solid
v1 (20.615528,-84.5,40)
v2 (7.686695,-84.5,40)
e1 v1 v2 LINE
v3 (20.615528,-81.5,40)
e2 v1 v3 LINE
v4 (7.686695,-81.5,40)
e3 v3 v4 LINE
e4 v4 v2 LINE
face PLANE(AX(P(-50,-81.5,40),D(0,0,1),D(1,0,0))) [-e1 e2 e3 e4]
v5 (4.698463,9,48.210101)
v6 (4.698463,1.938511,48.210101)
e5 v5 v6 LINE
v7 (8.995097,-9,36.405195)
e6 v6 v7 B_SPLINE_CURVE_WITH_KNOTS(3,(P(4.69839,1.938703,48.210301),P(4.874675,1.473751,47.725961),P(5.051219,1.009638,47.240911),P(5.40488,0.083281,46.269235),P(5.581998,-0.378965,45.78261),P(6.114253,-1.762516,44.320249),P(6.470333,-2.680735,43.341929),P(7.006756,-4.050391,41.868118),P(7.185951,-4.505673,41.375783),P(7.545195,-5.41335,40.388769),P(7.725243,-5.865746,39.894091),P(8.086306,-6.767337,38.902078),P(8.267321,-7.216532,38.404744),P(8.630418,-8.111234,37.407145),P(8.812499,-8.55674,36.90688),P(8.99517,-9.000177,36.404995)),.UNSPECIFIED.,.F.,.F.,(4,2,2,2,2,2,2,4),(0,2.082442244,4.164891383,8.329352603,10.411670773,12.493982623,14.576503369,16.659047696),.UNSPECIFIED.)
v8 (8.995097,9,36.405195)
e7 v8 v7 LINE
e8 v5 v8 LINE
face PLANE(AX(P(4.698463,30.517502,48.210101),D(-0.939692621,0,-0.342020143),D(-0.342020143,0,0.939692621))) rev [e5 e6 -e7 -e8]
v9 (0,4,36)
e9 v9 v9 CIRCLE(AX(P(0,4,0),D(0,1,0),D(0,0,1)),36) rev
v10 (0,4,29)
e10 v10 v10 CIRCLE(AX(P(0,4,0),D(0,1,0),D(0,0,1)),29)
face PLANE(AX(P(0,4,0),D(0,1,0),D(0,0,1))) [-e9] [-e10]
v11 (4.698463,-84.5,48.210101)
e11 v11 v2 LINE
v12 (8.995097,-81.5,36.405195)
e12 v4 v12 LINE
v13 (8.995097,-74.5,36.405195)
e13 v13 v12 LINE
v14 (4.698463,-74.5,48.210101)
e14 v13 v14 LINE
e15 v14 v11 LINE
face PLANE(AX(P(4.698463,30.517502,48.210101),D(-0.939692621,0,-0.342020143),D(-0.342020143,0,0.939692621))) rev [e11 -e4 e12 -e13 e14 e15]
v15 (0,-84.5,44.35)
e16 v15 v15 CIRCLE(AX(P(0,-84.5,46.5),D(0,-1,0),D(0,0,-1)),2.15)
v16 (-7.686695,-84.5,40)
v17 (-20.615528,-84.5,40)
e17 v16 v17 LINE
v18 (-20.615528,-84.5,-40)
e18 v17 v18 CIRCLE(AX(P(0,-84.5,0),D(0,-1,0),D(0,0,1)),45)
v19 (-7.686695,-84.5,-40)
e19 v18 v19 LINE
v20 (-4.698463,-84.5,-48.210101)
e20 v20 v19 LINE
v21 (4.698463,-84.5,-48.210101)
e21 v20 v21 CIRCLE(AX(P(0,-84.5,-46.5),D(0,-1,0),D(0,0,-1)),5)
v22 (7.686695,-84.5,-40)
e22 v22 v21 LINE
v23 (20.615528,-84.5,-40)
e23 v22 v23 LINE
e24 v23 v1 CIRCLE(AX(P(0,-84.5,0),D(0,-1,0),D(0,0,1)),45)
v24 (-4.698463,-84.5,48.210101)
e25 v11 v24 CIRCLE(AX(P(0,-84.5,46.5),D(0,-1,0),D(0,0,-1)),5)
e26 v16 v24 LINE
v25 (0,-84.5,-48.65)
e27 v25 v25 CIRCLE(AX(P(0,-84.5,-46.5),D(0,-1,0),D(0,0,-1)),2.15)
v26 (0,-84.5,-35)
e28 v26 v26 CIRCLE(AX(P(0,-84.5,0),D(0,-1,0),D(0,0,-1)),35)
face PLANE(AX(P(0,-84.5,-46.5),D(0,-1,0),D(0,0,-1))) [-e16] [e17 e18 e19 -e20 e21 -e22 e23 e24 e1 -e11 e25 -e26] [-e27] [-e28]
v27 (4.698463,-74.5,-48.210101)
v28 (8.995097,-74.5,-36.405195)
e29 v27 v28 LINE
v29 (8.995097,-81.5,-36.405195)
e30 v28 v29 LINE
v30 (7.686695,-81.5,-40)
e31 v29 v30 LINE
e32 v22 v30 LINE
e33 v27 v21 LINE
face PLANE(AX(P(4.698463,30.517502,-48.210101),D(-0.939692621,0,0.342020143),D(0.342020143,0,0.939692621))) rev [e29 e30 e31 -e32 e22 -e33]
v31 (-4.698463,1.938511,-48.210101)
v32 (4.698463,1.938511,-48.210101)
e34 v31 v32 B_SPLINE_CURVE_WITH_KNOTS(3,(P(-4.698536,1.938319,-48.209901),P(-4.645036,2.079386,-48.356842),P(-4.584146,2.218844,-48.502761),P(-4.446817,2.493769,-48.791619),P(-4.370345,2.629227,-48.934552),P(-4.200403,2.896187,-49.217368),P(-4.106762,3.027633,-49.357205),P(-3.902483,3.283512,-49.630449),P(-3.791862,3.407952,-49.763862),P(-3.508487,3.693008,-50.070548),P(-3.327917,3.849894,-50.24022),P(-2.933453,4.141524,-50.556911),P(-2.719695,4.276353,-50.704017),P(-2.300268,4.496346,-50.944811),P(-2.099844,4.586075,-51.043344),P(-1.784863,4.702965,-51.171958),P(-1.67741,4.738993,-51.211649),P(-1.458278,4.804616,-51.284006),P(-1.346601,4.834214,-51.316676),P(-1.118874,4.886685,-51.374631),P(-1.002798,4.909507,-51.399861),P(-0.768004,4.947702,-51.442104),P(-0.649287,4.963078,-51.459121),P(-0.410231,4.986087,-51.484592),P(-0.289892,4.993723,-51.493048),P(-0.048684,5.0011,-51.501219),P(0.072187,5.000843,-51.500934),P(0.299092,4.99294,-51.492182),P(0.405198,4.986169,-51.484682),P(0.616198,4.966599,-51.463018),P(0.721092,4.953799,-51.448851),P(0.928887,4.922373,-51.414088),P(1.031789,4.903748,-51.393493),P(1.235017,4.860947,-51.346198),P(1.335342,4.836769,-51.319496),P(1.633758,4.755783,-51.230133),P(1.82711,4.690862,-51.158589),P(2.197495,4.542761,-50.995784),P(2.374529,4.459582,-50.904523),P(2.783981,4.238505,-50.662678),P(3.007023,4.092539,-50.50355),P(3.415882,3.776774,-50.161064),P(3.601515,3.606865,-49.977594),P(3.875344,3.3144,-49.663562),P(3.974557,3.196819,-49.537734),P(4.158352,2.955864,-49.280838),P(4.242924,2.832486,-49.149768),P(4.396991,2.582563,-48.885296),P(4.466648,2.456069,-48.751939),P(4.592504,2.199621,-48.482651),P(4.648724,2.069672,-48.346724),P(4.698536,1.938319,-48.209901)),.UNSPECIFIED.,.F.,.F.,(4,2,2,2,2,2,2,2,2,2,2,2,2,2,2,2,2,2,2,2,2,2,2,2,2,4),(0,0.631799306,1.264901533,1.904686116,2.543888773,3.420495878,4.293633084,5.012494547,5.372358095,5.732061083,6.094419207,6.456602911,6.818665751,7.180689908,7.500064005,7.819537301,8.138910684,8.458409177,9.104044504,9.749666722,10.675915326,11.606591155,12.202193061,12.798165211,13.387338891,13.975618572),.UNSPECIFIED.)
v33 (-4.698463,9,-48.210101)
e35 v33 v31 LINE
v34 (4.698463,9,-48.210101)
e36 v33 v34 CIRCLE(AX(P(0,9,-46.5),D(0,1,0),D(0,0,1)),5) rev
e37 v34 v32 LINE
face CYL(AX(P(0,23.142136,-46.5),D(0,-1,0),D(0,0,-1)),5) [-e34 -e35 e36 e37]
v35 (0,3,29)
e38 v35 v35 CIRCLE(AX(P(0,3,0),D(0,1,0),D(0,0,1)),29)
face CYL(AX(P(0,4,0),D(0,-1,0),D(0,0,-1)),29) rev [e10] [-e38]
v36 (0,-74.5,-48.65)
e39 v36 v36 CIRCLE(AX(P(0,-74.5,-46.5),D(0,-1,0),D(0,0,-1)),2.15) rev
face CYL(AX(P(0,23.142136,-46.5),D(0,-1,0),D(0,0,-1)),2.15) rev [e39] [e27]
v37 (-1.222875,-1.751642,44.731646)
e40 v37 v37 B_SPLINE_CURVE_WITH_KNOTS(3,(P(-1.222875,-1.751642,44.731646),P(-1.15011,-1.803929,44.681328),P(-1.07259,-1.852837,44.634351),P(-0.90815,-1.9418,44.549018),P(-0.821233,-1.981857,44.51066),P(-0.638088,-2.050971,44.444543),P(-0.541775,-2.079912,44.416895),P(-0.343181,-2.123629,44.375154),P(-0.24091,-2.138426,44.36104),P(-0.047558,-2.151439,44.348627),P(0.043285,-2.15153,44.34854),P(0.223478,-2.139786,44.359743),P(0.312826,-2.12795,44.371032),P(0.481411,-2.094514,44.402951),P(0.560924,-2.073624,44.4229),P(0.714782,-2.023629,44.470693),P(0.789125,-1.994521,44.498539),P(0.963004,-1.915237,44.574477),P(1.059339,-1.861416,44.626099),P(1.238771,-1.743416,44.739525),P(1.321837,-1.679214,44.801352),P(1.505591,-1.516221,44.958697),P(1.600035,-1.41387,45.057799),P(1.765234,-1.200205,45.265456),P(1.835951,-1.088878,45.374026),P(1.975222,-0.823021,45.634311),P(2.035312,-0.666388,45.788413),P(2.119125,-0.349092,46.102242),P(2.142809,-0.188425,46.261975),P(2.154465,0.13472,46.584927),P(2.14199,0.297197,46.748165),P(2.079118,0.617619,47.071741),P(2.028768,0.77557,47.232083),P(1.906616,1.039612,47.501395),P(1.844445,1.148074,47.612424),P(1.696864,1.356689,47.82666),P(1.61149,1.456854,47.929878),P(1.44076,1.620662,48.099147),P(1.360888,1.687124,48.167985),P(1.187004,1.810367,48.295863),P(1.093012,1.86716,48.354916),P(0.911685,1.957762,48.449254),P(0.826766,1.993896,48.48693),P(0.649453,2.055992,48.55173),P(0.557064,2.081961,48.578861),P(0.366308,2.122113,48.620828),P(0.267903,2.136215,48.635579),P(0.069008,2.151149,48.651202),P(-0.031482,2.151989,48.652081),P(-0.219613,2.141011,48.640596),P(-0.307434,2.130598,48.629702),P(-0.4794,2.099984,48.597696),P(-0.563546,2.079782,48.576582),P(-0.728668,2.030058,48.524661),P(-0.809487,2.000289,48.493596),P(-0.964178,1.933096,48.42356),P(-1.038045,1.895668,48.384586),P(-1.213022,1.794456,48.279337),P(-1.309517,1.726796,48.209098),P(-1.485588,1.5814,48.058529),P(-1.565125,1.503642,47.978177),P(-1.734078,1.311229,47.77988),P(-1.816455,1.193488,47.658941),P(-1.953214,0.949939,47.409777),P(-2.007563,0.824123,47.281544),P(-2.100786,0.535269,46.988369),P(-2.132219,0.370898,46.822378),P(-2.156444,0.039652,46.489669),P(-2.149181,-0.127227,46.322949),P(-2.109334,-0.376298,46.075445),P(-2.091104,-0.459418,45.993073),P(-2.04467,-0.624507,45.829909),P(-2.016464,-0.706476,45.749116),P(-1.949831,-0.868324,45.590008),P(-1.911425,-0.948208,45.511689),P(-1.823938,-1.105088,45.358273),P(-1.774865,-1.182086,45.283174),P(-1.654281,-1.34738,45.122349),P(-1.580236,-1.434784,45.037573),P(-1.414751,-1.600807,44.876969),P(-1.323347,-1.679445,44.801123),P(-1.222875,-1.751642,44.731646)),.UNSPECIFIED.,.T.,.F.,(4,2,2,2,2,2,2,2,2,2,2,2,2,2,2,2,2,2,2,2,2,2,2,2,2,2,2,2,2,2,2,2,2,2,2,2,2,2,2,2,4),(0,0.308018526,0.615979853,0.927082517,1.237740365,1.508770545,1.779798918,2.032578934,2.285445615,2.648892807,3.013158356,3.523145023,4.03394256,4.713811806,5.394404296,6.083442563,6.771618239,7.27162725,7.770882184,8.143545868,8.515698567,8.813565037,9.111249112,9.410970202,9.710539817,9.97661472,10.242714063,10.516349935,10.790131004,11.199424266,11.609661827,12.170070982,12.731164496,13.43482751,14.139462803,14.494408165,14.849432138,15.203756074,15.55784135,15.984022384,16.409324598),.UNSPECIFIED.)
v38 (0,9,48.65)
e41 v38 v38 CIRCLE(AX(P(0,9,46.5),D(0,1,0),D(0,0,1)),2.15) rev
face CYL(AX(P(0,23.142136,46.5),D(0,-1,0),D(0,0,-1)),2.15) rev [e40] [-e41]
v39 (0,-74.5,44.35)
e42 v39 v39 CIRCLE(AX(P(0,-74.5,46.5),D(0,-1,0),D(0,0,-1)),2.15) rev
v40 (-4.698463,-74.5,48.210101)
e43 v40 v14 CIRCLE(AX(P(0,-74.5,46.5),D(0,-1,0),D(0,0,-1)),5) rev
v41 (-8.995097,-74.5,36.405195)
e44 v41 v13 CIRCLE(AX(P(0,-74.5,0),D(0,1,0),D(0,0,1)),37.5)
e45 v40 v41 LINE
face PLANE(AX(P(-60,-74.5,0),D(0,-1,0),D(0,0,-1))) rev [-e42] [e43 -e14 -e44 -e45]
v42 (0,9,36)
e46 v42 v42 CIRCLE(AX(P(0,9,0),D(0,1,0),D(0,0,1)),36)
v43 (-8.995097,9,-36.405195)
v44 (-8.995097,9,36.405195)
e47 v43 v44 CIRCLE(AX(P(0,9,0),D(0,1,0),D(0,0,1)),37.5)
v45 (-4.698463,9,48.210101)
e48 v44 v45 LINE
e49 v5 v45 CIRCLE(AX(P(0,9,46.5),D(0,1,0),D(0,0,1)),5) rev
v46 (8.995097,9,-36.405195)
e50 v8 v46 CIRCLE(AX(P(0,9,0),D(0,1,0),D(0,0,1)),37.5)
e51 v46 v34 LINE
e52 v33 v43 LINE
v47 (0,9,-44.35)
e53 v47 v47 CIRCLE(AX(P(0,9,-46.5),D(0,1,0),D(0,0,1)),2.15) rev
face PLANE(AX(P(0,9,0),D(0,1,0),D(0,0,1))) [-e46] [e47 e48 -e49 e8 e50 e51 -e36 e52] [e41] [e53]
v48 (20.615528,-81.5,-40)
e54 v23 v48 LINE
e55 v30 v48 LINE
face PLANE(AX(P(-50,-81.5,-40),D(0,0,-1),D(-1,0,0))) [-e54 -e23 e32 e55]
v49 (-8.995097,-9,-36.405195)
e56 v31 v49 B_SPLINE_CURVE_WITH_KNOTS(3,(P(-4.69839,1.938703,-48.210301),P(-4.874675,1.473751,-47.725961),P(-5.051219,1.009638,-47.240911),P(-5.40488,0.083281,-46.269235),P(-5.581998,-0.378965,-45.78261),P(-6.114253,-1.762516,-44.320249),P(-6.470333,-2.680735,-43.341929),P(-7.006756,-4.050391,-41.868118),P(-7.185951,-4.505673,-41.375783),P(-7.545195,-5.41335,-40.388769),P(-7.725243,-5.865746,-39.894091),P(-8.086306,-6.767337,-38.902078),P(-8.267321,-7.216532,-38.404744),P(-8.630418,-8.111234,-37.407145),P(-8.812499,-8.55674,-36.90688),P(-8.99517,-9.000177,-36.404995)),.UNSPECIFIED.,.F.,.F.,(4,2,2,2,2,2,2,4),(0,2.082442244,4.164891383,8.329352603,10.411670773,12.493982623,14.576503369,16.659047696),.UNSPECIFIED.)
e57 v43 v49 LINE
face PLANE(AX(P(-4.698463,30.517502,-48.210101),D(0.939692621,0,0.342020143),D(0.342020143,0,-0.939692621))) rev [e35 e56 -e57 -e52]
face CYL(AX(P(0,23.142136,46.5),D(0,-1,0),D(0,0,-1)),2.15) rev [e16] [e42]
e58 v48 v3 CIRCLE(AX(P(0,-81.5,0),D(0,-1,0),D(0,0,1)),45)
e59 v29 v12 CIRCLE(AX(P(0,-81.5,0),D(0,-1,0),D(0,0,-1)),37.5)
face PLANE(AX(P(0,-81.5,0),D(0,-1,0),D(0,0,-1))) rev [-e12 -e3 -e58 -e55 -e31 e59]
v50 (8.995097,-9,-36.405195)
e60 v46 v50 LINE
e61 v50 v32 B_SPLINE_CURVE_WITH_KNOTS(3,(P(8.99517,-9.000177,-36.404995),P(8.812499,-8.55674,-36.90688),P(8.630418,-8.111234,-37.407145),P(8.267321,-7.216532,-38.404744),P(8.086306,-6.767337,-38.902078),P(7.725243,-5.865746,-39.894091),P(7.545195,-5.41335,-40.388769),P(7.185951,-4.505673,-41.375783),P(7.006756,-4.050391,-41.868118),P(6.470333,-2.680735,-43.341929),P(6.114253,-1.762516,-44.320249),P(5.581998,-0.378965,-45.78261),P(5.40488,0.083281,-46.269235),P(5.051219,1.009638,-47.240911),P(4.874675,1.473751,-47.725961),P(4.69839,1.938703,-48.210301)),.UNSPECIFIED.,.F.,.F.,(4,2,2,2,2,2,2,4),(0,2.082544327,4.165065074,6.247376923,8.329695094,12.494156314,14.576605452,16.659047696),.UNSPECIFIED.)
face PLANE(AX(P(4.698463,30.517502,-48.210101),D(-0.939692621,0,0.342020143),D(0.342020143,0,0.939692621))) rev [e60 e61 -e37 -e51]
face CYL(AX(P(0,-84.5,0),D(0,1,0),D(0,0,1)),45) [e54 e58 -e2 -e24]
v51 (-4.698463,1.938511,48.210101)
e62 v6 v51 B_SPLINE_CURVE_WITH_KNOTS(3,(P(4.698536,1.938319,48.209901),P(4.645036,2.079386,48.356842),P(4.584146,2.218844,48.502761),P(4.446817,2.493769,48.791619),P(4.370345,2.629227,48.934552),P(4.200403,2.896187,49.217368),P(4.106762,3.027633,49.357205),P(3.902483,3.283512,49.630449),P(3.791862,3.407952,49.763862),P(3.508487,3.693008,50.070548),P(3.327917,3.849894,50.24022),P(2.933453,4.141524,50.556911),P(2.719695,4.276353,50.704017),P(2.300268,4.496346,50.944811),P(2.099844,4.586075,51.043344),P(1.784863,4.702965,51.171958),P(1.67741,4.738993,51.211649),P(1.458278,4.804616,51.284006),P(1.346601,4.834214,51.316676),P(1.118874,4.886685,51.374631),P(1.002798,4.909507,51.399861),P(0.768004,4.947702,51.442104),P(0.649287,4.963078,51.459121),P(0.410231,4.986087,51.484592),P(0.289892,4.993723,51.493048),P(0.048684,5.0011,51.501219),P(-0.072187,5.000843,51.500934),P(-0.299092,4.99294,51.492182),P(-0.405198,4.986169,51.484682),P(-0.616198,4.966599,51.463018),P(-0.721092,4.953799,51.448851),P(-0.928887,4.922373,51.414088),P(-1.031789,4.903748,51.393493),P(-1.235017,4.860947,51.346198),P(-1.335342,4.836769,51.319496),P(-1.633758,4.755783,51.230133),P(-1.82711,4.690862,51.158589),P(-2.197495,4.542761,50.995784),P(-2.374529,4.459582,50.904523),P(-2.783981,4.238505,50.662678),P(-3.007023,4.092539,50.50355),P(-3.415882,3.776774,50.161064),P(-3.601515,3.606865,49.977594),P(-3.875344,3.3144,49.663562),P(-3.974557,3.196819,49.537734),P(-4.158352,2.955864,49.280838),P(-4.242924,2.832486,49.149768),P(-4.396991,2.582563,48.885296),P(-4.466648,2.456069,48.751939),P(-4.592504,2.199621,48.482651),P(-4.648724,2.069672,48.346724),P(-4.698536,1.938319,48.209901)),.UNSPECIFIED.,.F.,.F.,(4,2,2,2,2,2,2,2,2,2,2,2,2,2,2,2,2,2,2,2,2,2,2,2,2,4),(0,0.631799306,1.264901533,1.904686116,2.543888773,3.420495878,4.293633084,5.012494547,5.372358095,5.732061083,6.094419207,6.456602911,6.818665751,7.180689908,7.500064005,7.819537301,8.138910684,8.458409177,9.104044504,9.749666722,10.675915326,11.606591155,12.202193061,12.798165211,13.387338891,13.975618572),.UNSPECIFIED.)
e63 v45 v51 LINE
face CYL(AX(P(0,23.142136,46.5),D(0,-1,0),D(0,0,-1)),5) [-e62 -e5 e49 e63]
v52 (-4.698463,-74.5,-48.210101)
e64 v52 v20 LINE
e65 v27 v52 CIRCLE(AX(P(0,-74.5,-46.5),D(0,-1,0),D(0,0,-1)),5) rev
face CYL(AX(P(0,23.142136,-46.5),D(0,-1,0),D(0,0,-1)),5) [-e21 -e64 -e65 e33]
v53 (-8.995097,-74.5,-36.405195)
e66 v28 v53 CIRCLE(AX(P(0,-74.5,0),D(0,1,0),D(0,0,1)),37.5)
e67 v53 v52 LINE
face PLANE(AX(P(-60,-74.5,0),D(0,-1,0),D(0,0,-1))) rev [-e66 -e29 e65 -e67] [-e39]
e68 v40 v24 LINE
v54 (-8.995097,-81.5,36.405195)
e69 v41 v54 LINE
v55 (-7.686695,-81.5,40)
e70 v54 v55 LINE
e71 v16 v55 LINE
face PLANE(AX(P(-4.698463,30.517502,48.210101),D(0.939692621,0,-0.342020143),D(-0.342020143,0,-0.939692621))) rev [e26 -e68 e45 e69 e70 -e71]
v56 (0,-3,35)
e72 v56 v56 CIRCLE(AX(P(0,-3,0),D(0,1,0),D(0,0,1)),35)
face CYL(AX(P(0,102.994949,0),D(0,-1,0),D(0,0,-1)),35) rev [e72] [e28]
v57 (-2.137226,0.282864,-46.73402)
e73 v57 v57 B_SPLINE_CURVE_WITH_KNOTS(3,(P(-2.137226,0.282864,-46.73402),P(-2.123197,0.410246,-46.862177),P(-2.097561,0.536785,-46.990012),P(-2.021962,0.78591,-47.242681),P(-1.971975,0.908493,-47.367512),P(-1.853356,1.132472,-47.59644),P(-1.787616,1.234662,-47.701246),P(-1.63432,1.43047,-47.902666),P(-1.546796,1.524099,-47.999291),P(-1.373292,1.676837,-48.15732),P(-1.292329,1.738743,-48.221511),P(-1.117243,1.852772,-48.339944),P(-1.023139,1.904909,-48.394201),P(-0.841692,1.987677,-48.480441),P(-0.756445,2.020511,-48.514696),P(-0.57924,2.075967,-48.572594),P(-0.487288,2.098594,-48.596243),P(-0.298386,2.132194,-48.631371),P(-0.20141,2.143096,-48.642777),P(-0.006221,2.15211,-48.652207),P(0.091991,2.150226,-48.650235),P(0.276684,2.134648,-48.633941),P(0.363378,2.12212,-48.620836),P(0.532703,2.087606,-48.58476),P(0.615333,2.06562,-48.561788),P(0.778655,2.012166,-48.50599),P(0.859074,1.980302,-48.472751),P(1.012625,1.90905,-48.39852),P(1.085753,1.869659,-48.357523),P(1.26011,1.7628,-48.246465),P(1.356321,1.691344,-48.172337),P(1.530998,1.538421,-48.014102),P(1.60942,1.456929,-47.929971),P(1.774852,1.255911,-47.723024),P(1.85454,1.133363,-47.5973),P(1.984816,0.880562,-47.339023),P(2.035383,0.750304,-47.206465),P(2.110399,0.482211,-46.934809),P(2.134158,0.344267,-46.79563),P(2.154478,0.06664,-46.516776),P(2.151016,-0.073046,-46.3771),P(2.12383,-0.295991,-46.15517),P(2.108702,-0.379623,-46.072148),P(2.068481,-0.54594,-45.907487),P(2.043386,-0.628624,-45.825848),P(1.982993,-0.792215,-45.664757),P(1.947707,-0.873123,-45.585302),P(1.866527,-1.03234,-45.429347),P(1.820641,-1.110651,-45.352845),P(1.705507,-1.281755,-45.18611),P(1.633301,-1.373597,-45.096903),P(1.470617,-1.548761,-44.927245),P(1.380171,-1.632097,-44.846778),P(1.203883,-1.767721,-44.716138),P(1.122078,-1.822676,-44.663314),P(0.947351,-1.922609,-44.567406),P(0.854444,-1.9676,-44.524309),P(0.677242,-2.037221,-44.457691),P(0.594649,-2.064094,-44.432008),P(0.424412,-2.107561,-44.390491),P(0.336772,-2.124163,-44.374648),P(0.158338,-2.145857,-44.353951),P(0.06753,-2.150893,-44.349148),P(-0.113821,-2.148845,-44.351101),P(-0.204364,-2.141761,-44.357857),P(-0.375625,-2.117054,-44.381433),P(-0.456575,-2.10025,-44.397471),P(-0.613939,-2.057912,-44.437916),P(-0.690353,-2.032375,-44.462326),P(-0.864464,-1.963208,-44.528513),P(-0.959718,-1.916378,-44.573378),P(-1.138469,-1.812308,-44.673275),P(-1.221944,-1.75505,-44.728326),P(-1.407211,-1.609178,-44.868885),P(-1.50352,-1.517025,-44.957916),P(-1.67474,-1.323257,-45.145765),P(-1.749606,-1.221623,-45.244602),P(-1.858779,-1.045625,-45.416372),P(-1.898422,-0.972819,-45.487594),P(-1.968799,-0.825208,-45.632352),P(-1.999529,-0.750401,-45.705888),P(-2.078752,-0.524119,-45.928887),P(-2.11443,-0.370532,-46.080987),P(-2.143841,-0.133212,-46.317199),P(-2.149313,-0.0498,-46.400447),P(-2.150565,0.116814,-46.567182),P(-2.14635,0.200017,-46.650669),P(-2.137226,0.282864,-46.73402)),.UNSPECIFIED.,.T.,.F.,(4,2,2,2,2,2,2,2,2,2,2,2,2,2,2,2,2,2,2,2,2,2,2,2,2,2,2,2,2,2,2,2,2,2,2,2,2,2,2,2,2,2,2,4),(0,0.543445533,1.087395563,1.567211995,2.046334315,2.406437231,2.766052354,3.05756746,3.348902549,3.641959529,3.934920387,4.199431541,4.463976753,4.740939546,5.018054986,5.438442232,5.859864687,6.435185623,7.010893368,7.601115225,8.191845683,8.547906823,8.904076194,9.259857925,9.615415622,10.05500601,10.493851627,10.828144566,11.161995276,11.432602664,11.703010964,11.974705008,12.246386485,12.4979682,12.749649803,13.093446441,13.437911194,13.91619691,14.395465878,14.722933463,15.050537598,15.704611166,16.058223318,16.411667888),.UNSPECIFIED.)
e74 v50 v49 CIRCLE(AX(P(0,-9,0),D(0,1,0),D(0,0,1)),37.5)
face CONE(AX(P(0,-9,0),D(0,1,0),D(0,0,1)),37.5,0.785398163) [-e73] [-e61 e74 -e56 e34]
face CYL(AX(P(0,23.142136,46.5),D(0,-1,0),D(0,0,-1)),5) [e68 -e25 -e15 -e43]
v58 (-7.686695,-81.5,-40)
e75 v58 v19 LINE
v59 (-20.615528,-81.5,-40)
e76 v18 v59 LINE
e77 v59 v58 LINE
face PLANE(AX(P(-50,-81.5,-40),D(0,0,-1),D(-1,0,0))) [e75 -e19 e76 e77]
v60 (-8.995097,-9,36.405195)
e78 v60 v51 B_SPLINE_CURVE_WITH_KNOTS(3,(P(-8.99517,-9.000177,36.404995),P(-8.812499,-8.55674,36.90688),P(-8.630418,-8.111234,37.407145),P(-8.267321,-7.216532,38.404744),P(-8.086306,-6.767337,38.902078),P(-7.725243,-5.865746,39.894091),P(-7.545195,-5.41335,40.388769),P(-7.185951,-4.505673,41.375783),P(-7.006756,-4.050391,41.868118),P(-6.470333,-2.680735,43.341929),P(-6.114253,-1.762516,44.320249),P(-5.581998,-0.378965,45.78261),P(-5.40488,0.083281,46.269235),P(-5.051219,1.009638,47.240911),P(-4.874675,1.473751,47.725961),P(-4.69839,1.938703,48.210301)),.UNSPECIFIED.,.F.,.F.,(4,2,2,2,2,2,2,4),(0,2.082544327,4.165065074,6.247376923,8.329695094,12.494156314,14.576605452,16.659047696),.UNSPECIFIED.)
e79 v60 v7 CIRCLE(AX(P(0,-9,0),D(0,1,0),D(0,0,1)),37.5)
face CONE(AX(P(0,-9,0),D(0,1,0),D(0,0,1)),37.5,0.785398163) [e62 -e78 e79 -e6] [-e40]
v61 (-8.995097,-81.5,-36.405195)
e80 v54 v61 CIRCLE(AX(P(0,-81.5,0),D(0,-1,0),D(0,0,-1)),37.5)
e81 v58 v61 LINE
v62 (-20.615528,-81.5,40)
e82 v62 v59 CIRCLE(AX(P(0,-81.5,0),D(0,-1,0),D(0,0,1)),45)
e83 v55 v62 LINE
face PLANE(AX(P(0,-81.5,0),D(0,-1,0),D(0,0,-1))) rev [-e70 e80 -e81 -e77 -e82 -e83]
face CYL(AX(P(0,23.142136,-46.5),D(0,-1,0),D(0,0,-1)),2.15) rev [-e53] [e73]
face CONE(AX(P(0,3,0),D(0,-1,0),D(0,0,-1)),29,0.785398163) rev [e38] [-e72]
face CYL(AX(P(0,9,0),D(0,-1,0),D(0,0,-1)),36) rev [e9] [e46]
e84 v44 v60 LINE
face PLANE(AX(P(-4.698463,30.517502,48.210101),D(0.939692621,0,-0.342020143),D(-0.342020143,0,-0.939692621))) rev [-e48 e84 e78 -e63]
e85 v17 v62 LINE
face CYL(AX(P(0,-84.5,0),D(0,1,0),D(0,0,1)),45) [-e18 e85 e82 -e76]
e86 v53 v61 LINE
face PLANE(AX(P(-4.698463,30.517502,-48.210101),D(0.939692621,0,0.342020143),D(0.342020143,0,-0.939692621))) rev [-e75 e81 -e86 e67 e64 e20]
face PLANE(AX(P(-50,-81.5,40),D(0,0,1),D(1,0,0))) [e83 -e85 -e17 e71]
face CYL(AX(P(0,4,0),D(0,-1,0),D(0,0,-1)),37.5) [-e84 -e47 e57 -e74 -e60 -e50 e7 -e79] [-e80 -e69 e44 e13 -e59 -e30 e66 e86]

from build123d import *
from build123d.topology import SkipClean

# Parameters (mm, degrees)
SKETCH_1_R          = 37.5
SKETCH_1_R_2        = 29
EXTRUDE_1_DEPTH     = 4
SKETCH_2_R          = 37.5
SKETCH_2_R_2        = 36
EXTRUDE_2_DEPTH     = 5
EXTRUDE_START       = 84.5
SKETCH_3_R          = 37.5
SKETCH_3_R_2        = 29
EXTRUDE_3_DEPTH     = 84.5
SKETCH_4_W          = 100
SKETCH_4_H          = 80
SKETCH_4_R          = 37.5
EXTRUDE_4_DEPTH     = 3
SKETCH_5_R          = 5
SKETCH_5_R_2        = 2.15
EXTRUDE_5_DEPTH     = 93.5
EXTRUDE_5_2_DEPTH   = 93.5
EXTRUDE_START_2     = -3
EXTRUDE_6_DEPTH     = 93.5
SKETCH_8_R          = 35
CUT_EXTRUDE_1_DEPTH = 87.5
CHAMFER_1_SIZE      = 6
CUT_EXTRUDE_2_DEPTH = 116.509739972


with BuildPart() as part:
    # 草图1 → 凸台-拉伸1 (new body)
    with BuildSketch(Plane(origin=(0, 0, 0), x_dir=(1, 0, 0), z_dir=(0, 1, 0))):
        with Locations(Location((0, 0, 0), (0, 0, 270))):
            Circle(SKETCH_1_R)
        with Locations(Location((0, 0, 0), (0, 0, 270))):
            Circle(SKETCH_1_R_2, mode=Mode.SUBTRACT)
    extrude(amount=EXTRUDE_1_DEPTH)

    # 草图2 → 凸台-拉伸2 (add)
    with BuildSketch(Plane(origin=(0, 4, 0), x_dir=(1, 0, 0), z_dir=(0, 1, 0))):
        with Locations(Location((0, 0, 0), (0, 0, 270))):
            Circle(SKETCH_2_R)
        with Locations(Location((0, 0, 0), (0, 0, 270))):
            Circle(SKETCH_2_R_2, mode=Mode.SUBTRACT)
    extrude(amount=EXTRUDE_2_DEPTH)

    # 草图3 → 凸台-拉伸3 (add)
    with BuildSketch(Plane.XZ.offset(EXTRUDE_START)):
        with Locations(Location((0, 0, 0), (0, 0, 270))):
            Circle(SKETCH_3_R)
        with Locations(Location((0, 0, 0), (0, 0, 270))):
            Circle(SKETCH_3_R_2, mode=Mode.SUBTRACT)
    extrude(amount=-EXTRUDE_3_DEPTH)

    # 草图4 → 凸台-拉伸4 (add)
    with BuildSketch(Plane.XZ.offset(84.5)):
        Rectangle(SKETCH_4_W, SKETCH_4_H)
        with Locations(Location((0, 0, 0), (0, 0, 270))):
            Circle(SKETCH_4_R, mode=Mode.SUBTRACT)
    extrude(amount=-EXTRUDE_4_DEPTH)

    # 草图6 → 凸台-拉伸6 (add)
    with SkipClean():  # the faces are left unmerged after this step: merging them gives an invalid solid
        with BuildSketch(Plane(origin=(0, -81.5, 0), x_dir=(1, 0, 0), z_dir=(0, 1, 0)).offset(EXTRUDE_START_2)):
            with BuildLine():
                Line((-4.698463104, 48.210100717), (-8.995097405, 36.405194996))
                ThreePointArc((-8.995097405, 36.405194996), (0, 37.5), (8.995097405, 36.405194996))
                Line((8.995097405, 36.405194996), (4.698463104, 48.210100717))
                ThreePointArc((4.698463104, 48.210100717), (0, 41.5), (-4.698463104, 48.210100717))
            make_face()
            with BuildLine():
                Line((4.698463104, -48.210100717), (8.995097405, -36.405194996))
                ThreePointArc((8.995097405, -36.405194996), (0, -37.5), (-8.995097405, -36.405194996))
                Line((-8.995097405, -36.405194996), (-4.698463104, -48.210100717))
                ThreePointArc((-4.698463104, -48.210100717), (0, -41.5), (4.698463104, -48.210100717))
            make_face()
        extrude(amount=EXTRUDE_6_DEPTH)


with BuildPart() as body_2:
    # 草图5 → 凸台-拉伸5 (new body)
    with BuildSketch(Plane.XZ.offset(84.5)):
        with Locations(Location((0, 46.5, 0), (0, 0, 270))):
            Circle(SKETCH_5_R)
        with Locations(Location((0, 46.5, 0), (0, 0, 270))):
            Circle(SKETCH_5_R_2, mode=Mode.SUBTRACT)
    extrude(amount=-EXTRUDE_5_DEPTH)


with BuildPart() as body_3:
    # 草图5 → Extrude 5 2 (new body)
    with BuildSketch(Plane.XZ.offset(84.5)):
        with Locations(Location((0, -46.5, 0), (0, 0, 270))):
            Circle(SKETCH_5_R)
        with Locations(Location((0, -46.5, 0), (0, 0, 270))):
            Circle(SKETCH_5_R_2, mode=Mode.SUBTRACT)
    extrude(amount=-EXTRUDE_5_2_DEPTH)

    # Combine 2: union body 2, part
    add(body_2.part)
    add(part.part)

    # 草图8 → 切除-拉伸1 (cut)
    with BuildSketch(Plane.XZ.offset(84.5)):
        with Locations(Location((0, 0, 0), (0, 0, 270))):
            Circle(SKETCH_8_R)
    extrude(amount=-CUT_EXTRUDE_1_DEPTH, mode=Mode.SUBTRACT)

    # 倒角1
    chamfer_1_edges = [body_3.edges().sort_by_distance(p)[0] for p in [
        (0, 3, 35),
    ]]
    chamfer(chamfer_1_edges, length=CHAMFER_1_SIZE - 0.0001)  # a hair under: the kernel refuses the full size

    # 草图9 → 切除-旋转1 (revolve, cut)
    with BuildSketch(Plane.XY, mode=Mode.PRIVATE) as cut_revolve_1_sk:
        Polygon((-37.5, -9), (-60, 13.5), (-60, -74.5), (-37.5, -74.5), align=None)
    revolve(cut_revolve_1_sk.sketch.rotate(Axis((0, 9, 0), (0, -1, 0)), 76.121175643), axis=Axis((0, 9, 0), (0, -1, 0)), mode=Mode.SUBTRACT)

    # 草图11 → 切除-拉伸2 (cut, through all)
    with BuildSketch(Plane(origin=(0, -81.5, 0), x_dir=(1, 0, 0), z_dir=(0, 1, 0))):
        with BuildLine():
            Line((-20.615528128, 40), (-50, 40))
            Line((-50, 40), (-50, -40))
            Line((-50, -40), (-20.615528128, -40))
            ThreePointArc((-20.615528128, -40), (-45, 0), (-20.615528128, 40))
        make_face()
        with BuildLine():
            Line((20.615528128, 40), (50, 40))
            Line((50, 40), (50, -40))
            Line((50, -40), (20.615528128, -40))
            ThreePointArc((20.615528128, -40), (45, 0), (20.615528128, 40))
        make_face()
    extrude(amount=-CUT_EXTRUDE_2_DEPTH, mode=Mode.SUBTRACT)


solid = body_3.part
